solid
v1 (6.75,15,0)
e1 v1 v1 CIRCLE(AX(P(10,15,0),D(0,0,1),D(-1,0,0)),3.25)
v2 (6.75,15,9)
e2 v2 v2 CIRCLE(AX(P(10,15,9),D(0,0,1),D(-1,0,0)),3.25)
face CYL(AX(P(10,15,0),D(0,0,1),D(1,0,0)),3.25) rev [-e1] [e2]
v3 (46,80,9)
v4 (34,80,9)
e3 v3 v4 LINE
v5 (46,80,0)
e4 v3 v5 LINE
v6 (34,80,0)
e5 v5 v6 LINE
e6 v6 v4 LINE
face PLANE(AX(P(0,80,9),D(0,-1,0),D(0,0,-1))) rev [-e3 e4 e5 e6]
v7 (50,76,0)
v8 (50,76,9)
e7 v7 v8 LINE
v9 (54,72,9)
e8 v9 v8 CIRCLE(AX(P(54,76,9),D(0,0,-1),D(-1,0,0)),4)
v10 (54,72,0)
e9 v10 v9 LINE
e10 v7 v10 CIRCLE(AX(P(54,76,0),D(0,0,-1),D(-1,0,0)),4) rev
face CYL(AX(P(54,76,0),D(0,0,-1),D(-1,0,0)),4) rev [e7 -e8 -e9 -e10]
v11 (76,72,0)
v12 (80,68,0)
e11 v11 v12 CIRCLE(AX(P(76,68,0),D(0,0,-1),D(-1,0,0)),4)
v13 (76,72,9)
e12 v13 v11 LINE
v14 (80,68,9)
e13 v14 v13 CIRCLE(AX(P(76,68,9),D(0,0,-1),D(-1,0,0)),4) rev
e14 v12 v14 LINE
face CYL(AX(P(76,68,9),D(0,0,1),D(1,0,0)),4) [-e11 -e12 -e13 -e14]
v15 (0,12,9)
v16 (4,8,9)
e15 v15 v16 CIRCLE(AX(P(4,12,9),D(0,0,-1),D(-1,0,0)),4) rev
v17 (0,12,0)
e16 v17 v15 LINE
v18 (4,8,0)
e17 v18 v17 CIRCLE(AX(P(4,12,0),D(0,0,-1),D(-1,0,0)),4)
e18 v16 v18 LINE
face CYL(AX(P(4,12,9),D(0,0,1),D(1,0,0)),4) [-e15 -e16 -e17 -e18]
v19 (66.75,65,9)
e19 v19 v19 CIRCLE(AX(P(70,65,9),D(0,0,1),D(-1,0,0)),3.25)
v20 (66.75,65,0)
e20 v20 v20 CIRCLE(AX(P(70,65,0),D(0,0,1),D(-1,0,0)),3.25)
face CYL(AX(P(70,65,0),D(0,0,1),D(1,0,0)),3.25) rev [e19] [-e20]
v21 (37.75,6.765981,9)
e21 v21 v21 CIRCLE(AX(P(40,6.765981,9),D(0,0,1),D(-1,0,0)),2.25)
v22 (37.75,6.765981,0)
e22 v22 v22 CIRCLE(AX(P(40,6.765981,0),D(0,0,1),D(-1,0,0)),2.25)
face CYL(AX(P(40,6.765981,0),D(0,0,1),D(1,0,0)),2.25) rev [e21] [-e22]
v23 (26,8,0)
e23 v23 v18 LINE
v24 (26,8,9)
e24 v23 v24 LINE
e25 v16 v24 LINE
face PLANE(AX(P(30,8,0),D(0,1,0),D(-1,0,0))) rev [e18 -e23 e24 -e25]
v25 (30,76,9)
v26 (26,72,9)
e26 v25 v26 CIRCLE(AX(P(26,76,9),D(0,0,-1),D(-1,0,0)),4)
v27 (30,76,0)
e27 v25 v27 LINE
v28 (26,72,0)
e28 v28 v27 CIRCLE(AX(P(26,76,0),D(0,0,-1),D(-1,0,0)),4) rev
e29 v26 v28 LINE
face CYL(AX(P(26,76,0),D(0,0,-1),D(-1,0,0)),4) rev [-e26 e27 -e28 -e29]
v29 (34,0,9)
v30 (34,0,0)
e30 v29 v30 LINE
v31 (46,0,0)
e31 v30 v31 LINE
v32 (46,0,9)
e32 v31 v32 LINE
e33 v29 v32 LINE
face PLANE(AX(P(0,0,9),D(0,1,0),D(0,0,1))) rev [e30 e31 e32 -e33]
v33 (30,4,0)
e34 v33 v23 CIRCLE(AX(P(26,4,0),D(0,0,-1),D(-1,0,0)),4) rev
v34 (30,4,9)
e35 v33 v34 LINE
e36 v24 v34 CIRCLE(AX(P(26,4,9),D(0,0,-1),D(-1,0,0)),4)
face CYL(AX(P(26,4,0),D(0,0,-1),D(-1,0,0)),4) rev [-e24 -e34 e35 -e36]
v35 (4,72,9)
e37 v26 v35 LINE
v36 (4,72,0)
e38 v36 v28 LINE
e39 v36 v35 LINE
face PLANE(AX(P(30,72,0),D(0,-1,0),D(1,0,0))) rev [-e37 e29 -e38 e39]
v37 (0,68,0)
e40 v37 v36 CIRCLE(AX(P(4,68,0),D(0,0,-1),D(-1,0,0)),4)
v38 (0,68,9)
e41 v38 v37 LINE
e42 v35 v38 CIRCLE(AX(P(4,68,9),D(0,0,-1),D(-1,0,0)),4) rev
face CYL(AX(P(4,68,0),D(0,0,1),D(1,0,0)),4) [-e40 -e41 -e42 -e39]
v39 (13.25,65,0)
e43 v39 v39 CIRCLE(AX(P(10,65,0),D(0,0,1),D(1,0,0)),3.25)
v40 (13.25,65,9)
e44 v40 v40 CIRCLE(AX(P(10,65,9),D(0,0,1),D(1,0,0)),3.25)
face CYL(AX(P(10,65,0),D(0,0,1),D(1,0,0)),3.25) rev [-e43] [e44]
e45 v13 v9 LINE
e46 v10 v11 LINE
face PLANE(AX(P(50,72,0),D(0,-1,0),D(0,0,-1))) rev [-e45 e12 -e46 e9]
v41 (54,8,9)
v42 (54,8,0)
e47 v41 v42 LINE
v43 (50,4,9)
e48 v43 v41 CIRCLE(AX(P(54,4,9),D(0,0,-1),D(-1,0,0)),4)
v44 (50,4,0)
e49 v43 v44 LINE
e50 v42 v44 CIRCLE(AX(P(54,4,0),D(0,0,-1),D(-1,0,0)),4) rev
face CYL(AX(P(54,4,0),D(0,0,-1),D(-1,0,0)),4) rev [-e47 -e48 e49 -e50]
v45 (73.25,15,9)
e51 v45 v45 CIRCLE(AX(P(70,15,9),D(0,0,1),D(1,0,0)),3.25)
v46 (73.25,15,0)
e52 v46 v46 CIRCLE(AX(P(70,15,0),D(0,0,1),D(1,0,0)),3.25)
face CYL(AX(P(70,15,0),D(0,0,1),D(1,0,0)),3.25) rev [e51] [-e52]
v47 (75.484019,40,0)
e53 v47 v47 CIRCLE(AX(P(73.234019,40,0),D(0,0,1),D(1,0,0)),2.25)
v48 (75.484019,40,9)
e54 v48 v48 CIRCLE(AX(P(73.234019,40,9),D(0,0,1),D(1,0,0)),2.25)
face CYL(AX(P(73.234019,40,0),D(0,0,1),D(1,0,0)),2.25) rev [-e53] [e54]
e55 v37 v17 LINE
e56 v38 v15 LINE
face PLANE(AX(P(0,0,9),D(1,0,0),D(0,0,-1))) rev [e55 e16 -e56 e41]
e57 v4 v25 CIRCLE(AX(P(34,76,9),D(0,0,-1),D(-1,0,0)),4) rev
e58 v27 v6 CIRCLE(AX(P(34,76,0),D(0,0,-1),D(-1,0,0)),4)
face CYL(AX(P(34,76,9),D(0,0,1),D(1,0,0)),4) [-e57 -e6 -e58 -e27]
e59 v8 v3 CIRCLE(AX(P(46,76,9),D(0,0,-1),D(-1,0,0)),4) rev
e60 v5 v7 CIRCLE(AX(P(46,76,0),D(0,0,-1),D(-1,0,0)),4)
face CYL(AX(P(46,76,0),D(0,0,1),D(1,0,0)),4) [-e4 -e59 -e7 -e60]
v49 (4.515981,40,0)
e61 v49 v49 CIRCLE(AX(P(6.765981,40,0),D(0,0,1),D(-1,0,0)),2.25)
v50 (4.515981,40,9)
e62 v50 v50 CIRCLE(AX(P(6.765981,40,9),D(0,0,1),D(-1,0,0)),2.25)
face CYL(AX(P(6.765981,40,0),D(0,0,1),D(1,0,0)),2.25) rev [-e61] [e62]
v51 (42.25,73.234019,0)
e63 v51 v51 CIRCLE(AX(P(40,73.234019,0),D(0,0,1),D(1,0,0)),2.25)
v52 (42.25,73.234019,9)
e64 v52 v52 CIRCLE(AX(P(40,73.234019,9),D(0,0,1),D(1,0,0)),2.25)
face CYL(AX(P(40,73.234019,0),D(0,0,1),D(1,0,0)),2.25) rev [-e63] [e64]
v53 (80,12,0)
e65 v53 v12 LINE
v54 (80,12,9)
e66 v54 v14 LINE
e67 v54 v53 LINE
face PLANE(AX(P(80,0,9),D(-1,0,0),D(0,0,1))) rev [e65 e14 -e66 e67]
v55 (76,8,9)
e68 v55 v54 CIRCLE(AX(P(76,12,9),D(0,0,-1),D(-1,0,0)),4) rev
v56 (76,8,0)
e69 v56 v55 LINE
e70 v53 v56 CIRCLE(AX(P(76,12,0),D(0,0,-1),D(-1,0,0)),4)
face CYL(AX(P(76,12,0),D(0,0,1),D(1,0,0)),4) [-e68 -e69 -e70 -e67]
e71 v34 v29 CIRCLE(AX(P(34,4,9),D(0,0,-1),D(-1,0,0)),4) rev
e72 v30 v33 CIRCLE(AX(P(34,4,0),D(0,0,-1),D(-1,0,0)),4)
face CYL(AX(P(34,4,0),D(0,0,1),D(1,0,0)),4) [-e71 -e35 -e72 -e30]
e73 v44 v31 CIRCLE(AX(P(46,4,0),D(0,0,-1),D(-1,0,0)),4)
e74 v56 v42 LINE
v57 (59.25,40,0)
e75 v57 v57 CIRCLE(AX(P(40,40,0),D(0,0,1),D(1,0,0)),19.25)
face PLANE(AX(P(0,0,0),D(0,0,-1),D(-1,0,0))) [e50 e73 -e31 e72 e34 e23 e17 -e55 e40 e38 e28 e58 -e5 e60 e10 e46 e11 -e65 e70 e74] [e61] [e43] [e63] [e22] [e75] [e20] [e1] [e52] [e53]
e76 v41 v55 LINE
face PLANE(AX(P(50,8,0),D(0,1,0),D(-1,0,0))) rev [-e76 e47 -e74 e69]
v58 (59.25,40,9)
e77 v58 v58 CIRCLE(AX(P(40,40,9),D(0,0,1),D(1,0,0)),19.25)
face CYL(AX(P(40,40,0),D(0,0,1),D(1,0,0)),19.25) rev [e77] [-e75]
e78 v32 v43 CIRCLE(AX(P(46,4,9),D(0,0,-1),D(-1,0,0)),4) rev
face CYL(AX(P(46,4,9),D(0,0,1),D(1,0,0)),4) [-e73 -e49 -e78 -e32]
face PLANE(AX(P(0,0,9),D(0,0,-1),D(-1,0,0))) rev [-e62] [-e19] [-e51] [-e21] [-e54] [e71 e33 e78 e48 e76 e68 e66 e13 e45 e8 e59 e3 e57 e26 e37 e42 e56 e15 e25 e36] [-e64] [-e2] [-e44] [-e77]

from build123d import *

# Parameters (mm, degrees)
ESQUISSE1_W                  = 80
ESQUISSE1_H                  = 80
BOSS_EXTRU_1_DEPTH           = 9
ESQUISSE2_R                  = 19.25
ESQUISSE2_R_2                = 2.25
ESQUISSE2_R_3                = 3.25
ENL_V_MAT_EXTRU_1_DEPTH      = 114.494493258
ENL_V_MAT_EXTRU_2_DEPTH      = 114.494493258
ENL_V_MAT_EXTRU_2_DEPTH_BACK = 114.494493258
ESQUISSE3_W                  = 30
ESQUISSE3_H                  = 8
CONG_1_R                     = 4


with BuildPart() as part:
    # Esquisse1 → Boss.-Extru.1 (new body)
    with BuildSketch(Plane.XY):
        with Locations((40, 40)):
            Rectangle(ESQUISSE1_W, ESQUISSE1_H)
    extrude(amount=BOSS_EXTRU_1_DEPTH)

    # Esquisse2 → Enlèv. mat.-Extru.1 (cut, through all)
    with BuildSketch(Plane.XY.offset(9)):
        with Locations((40, 40)):
            Circle(ESQUISSE2_R)
        with Locations((73.234018716, 40)):
            Circle(ESQUISSE2_R_2)
        with Locations((40, 73.234018716)):
            Circle(ESQUISSE2_R_2)
        with Locations(Location((6.765981284, 40, 0), (0, 0, 180))):
            Circle(ESQUISSE2_R_2)
        with Locations(Location((40, 6.765981284, 0), (0, 0, 180))):
            Circle(ESQUISSE2_R_2)
        with Locations((10, 65)):
            Circle(ESQUISSE2_R_3)
        with Locations(Location((70, 65, 0), (0, 0, 180))):
            Circle(ESQUISSE2_R_3)
        with Locations((70, 15)):
            Circle(ESQUISSE2_R_3)
        with Locations(Location((10, 15, 0), (0, 0, 180))):
            Circle(ESQUISSE2_R_3)
    extrude(amount=-ENL_V_MAT_EXTRU_1_DEPTH, mode=Mode.SUBTRACT)

    # Esquisse3 → Enlèv. mat.-Extru.2 (cut, two sides: drawn at the far end of the back side and taken through both)
    with BuildSketch(Plane.XY.offset(9).offset(-ENL_V_MAT_EXTRU_2_DEPTH_BACK)):
        with Locations((15, 76)):
            Rectangle(ESQUISSE3_W, ESQUISSE3_H)
        with Locations((65, 76)):
            Rectangle(ESQUISSE3_W, ESQUISSE3_H)
        with Locations((15, 4)):
            Rectangle(ESQUISSE3_W, ESQUISSE3_H)
        with Locations((65, 4)):
            Rectangle(ESQUISSE3_W, ESQUISSE3_H)
    extrude(amount=ENL_V_MAT_EXTRU_2_DEPTH + ENL_V_MAT_EXTRU_2_DEPTH_BACK, mode=Mode.SUBTRACT)

    # Congé1
    cong_1_edges = [part.edges().sort_by_distance(p)[0] for p in [
        (30, 72, 4.5),
        (50, 72, 4.5),
        (50, 8, 4.5),
        (30, 8, 4.5),
        (0, 8, 4.5),
        (30, 0, 4.5),
        (50, 0, 4.5),
        (80, 8, 4.5),
        (80, 72, 4.5),
        (50, 80, 4.5),
        (30, 80, 4.5),
        (0, 72, 4.5),
    ]]
    fillet(cong_1_edges, radius=CONG_1_R - 0.0001)  # a hair under: the kernel refuses the full size


solid = part.part
